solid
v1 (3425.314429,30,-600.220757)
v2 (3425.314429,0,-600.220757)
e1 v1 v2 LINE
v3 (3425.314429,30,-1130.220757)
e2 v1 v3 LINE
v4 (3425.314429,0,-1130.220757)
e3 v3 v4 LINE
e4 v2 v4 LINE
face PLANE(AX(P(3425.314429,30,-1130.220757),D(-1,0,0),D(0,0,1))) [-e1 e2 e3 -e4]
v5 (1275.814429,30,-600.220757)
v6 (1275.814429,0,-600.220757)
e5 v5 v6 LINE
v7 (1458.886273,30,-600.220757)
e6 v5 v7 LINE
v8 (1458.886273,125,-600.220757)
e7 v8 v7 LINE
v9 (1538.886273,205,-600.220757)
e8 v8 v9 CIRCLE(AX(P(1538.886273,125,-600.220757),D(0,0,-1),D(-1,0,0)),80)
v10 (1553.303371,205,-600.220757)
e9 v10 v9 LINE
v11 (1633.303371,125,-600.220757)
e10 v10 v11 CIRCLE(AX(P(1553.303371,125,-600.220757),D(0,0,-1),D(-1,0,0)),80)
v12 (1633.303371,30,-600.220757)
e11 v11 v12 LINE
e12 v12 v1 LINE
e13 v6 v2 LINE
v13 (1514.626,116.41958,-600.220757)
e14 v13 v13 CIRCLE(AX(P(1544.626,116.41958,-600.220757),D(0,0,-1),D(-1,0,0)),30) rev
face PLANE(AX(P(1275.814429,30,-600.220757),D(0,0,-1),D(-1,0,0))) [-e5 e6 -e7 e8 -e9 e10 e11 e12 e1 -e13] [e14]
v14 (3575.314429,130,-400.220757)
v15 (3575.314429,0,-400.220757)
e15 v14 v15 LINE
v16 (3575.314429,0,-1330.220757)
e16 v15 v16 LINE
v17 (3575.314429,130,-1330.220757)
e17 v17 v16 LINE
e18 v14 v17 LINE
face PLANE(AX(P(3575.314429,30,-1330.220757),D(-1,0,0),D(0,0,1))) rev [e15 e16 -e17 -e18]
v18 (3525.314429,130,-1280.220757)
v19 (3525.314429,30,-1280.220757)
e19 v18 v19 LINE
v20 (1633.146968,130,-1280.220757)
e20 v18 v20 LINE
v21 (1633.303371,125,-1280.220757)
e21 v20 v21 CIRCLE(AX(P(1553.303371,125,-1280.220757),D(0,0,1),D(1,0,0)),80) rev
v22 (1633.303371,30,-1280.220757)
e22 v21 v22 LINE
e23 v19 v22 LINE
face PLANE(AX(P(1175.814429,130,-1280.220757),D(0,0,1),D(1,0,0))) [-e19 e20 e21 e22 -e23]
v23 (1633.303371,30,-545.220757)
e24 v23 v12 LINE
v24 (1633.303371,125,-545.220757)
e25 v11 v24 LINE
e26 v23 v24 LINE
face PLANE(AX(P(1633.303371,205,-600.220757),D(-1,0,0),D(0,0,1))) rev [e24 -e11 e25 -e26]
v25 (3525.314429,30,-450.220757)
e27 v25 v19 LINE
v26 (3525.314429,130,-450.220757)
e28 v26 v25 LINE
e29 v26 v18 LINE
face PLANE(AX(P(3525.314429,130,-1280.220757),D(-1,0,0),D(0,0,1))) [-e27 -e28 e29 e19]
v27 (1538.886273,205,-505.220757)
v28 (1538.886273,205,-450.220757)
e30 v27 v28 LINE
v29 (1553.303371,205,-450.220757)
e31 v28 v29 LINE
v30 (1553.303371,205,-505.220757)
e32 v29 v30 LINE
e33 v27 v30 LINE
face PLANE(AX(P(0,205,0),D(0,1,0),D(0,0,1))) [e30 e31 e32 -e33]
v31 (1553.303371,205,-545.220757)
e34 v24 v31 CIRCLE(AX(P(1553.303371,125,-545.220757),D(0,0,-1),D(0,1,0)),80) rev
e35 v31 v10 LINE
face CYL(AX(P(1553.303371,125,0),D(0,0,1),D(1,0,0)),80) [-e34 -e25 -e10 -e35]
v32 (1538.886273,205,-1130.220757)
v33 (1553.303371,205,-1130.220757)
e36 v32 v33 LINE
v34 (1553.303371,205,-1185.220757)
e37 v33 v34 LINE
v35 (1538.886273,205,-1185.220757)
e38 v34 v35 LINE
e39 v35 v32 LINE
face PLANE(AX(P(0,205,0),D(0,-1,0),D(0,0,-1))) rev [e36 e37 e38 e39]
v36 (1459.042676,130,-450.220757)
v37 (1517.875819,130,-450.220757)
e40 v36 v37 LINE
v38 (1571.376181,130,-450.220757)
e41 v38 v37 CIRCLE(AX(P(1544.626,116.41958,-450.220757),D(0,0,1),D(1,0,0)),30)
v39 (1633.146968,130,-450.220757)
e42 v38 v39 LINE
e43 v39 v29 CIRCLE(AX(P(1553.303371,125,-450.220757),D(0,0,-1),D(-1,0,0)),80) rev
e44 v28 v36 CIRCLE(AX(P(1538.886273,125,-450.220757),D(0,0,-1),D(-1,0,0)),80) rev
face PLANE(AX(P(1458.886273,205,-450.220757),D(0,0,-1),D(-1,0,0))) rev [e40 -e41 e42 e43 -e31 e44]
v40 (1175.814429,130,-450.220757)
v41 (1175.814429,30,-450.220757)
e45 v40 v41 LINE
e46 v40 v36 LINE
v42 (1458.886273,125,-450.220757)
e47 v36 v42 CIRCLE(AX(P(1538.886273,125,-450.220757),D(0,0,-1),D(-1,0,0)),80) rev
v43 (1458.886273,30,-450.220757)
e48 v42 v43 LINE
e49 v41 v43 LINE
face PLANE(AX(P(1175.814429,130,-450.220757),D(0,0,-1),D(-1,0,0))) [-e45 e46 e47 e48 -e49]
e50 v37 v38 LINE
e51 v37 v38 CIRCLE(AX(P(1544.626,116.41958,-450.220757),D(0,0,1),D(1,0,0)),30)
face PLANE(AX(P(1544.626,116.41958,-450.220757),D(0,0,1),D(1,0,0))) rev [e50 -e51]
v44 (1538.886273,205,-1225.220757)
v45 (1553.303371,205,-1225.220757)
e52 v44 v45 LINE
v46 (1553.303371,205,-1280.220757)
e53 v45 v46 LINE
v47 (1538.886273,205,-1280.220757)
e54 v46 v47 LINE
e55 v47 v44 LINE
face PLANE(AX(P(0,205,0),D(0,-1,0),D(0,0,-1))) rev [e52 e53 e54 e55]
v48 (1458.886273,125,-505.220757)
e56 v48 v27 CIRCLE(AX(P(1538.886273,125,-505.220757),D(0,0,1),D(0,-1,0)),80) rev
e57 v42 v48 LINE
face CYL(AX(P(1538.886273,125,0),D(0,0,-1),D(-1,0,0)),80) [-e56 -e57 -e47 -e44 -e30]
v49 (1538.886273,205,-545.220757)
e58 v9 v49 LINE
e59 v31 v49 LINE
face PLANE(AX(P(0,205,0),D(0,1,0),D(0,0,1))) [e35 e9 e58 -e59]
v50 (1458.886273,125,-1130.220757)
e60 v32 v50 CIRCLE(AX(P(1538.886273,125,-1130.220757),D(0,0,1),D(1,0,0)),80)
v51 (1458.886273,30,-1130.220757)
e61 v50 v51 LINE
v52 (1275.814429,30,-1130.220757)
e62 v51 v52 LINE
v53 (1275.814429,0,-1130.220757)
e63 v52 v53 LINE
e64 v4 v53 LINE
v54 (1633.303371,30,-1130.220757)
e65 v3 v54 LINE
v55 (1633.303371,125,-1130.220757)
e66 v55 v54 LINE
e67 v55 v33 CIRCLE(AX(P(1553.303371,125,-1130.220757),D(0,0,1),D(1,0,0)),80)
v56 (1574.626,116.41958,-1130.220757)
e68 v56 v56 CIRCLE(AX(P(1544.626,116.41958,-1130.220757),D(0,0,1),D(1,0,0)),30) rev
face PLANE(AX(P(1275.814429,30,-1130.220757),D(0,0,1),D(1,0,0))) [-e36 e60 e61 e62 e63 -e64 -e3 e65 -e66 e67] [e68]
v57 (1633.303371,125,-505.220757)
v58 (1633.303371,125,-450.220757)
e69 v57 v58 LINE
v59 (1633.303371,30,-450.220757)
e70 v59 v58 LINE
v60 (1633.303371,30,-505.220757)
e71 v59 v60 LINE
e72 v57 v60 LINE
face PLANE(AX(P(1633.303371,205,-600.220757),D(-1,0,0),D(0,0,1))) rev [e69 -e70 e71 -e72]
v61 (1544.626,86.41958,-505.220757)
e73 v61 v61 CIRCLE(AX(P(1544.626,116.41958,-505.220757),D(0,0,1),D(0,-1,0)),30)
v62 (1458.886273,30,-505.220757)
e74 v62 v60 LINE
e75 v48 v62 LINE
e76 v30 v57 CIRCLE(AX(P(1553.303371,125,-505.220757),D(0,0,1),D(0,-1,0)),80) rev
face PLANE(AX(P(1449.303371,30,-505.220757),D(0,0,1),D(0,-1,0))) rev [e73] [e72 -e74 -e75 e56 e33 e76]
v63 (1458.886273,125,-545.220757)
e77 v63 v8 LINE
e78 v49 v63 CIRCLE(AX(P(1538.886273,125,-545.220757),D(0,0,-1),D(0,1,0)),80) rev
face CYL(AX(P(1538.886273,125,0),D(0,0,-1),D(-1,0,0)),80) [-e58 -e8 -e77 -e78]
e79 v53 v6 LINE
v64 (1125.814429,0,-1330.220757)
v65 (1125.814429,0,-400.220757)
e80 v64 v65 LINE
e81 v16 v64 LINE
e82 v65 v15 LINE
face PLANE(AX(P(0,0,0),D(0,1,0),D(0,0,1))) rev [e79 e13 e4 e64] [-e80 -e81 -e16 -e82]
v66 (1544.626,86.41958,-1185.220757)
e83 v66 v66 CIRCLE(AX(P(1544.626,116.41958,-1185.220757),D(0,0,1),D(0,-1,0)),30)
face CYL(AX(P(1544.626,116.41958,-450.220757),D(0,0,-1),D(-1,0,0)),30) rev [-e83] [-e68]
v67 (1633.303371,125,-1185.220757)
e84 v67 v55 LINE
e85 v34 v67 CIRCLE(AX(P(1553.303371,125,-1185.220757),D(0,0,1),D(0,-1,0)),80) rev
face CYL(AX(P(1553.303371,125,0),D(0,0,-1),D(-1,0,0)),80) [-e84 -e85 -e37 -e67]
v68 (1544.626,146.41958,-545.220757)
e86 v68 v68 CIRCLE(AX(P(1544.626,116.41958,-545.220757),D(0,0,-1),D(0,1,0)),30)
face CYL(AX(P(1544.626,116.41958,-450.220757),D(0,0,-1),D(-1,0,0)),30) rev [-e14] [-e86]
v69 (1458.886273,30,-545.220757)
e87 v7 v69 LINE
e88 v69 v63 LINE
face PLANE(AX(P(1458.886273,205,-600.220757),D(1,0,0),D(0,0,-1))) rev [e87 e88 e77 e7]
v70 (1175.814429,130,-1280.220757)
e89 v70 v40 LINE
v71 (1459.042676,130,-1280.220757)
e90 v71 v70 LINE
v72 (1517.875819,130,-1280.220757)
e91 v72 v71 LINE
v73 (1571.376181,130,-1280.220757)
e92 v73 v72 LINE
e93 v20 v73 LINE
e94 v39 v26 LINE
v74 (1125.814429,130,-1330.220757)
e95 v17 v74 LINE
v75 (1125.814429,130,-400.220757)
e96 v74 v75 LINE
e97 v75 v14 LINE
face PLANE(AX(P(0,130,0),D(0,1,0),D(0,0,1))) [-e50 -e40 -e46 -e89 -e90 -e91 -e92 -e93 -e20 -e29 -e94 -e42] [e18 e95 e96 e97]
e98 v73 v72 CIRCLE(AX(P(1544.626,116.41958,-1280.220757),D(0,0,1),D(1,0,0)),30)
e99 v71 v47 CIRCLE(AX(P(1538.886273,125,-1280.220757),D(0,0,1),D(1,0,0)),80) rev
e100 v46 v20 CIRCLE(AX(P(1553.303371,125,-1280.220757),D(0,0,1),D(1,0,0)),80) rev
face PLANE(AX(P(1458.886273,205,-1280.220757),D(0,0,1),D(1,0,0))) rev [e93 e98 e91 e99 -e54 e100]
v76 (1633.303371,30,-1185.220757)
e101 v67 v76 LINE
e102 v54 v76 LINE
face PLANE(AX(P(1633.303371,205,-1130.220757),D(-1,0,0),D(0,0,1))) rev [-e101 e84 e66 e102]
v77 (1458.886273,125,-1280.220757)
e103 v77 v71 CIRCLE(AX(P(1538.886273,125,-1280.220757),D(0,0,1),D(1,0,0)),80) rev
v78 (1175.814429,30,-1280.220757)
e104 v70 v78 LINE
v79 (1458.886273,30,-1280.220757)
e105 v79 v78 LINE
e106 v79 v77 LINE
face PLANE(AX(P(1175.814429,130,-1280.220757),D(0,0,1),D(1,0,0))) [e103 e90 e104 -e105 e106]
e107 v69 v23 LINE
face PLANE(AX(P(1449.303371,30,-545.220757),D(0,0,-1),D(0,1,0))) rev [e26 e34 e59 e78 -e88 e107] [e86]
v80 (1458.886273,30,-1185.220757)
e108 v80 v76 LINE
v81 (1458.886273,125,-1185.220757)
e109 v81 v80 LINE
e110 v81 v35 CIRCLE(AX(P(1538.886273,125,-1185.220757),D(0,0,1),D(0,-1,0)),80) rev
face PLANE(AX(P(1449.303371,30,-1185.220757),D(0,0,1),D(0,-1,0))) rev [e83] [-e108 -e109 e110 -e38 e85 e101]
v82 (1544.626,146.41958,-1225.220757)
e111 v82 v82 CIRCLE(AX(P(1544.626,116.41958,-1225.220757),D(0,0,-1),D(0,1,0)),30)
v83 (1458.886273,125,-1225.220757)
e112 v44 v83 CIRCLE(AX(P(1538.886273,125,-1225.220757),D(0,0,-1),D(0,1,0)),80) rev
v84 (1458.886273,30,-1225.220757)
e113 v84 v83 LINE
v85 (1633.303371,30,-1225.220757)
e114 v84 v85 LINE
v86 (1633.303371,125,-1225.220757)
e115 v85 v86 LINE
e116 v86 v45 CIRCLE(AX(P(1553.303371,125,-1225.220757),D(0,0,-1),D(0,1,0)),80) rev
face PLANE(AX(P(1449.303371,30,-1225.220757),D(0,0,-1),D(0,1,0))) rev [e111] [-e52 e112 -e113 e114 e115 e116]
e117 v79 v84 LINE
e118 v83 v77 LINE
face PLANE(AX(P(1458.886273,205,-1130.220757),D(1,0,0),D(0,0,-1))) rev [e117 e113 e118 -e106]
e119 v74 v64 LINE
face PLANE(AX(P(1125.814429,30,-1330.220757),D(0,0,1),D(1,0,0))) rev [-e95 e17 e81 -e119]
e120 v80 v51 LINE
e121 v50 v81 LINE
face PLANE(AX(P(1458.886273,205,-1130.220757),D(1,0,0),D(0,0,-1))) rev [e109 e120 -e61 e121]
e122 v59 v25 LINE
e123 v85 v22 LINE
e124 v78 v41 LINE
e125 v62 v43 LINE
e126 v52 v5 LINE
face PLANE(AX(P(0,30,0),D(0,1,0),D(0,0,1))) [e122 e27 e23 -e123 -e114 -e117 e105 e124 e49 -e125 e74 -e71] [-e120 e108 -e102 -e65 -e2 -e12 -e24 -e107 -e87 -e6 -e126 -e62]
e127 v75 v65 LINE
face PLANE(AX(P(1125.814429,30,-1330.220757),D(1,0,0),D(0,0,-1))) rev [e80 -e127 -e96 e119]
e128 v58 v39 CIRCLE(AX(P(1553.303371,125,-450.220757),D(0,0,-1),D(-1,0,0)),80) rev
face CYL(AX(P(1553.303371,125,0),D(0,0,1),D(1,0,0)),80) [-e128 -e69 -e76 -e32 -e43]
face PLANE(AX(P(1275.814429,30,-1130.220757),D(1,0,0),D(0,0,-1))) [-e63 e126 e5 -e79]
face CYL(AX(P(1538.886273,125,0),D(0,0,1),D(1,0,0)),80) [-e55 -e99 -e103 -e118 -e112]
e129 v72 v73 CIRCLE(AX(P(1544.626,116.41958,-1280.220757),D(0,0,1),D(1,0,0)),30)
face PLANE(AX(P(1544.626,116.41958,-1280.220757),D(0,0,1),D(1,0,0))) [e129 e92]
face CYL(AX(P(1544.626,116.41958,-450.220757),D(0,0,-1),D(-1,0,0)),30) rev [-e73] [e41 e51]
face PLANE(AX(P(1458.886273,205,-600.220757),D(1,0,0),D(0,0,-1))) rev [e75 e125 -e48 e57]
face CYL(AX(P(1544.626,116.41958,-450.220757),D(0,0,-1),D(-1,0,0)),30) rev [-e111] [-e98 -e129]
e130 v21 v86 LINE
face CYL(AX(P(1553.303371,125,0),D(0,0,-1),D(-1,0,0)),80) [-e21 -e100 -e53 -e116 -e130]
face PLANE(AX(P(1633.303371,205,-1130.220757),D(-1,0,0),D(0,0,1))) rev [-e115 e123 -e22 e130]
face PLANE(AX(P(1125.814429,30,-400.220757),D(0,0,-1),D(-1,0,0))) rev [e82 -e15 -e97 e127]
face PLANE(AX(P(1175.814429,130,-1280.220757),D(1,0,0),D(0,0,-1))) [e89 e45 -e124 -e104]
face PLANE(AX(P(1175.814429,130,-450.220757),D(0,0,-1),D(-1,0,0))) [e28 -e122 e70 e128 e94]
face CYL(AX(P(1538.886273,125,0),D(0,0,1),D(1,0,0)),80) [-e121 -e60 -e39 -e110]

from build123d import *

# Parameters (mm, degrees)
SKETCH4_W               = 2449.5
SKETCH4_H               = 930
SKETCH4_W_2             = 2149.5
SKETCH4_H_2             = 530
BOSS_EXTRUDE2_DEPTH     = 30
SKETCH6_W               = 2449.5
SKETCH6_H               = 930
SKETCH6_W_2             = 2349.5
SKETCH6_H_2             = 830
BOSS_EXTRUDE3_DEPTH     = 100
SKETCH8_W               = 174.417097876
SKETCH8_H               = 150
BOSS_EXTRUDE4_DEPTH     = 175
CUT_EXTRUDE1_DEPTH      = 680
CUT_EXTRUDE1_DEPTH_BACK = 150
SKETCH10_R              = 30
FILLET1_R               = 80
SKETCH12_W              = 40
SKETCH12_H              = 200
CUT_EXTRUDE2_DEPTH      = 184


with BuildPart() as part:
    # Sketch4 → Boss-Extrude2 (new body)
    with BuildSketch(Plane(origin=(0, 0, 0), x_dir=(1, 0, 0), z_dir=(0, 1, 0))):
        with Locations((2350.564429087, 865.22075714)):
            Rectangle(SKETCH4_W, SKETCH4_H)
        with Locations((2350.564429087, 865.22075714)):
            Rectangle(SKETCH4_W_2, SKETCH4_H_2, mode=Mode.SUBTRACT)
    extrude(amount=BOSS_EXTRUDE2_DEPTH)

    # Sketch6 → Boss-Extrude3 (add)
    with BuildSketch(Plane(origin=(0, 30, 0), x_dir=(1, 0, 0), z_dir=(0, 1, 0))):
        with Locations((2350.564429087, 865.22075714)):
            Rectangle(SKETCH6_W, SKETCH6_H)
        with Locations((2350.564429087, 865.22075714)):
            Rectangle(SKETCH6_W_2, SKETCH6_H_2, mode=Mode.SUBTRACT)
    extrude(amount=BOSS_EXTRUDE3_DEPTH)

    # Sketch8 → Boss-Extrude4 (add)
    with BuildSketch(Plane(origin=(0, 30, 0), x_dir=(1, 0, 0), z_dir=(0, 1, 0))):
        with Locations((1546.094821657, 1205.22075714)):
            Rectangle(SKETCH8_W, SKETCH8_H)
        with Locations((1546.094821657, 525.22075714)):
            Rectangle(SKETCH8_W, SKETCH8_H)
    extrude(amount=BOSS_EXTRUDE4_DEPTH)

    # Sketch10 → Cut-Extrude1 (cut, two sides: drawn at the far end of the back side and taken through both)
    with BuildSketch(Plane.XY.offset(-1130.22075714).offset(-CUT_EXTRUDE1_DEPTH_BACK)):
        with Locations(Location((1544.625999864, 116.419579706, 0), (0, 0, 180))):
            Circle(SKETCH10_R)
    extrude(amount=CUT_EXTRUDE1_DEPTH + CUT_EXTRUDE1_DEPTH_BACK, mode=Mode.SUBTRACT)

    # Fillet1
    # the kernel refuses this fillet: 80 mm, written as the material it takes off along each edge
    with BuildSketch(Plane(origin=(1633.303370595, 205, -1280.22075714), x_dir=(0, -1, 0), z_dir=(0, 0, 1)), Plane(origin=(1458.886272719, 205, -450.22075714), x_dir=(0, -1, 0), z_dir=(0, 0, -1))) as fillet1_piece_1:
        with BuildLine():
            CenterArc((FILLET1_R, -FILLET1_R), FILLET1_R, 90, 90)
            Line((0, -FILLET1_R), (0, 0))
            Line((0, 0), (FILLET1_R, 0))
        make_face()
    extrude(amount=350, mode=Mode.SUBTRACT)
    with BuildSketch(Plane(origin=(1458.886272719, 205, -930.22075714), x_dir=(1, 0, 0), z_dir=(0, 0, -1)), Plane(origin=(1633.303370595, 205, -800.22075714), x_dir=(-1, 0, 0), z_dir=(0, 0, 1))) as fillet1_piece_2:
        with BuildLine():
            CenterArc((FILLET1_R, FILLET1_R), FILLET1_R, 180, 90)
            Line((0, FILLET1_R), (0, 0))
            Line((0, 0), (FILLET1_R, 0))
        make_face()
    extrude(amount=350, mode=Mode.SUBTRACT)

    # Sketch12 → Cut-Extrude2 (cut)
    with BuildSketch(Plane(origin=(1633.303370595, 0, 0), x_dir=(0, 0, -1), z_dir=(1, 0, 0))):
        with Locations((1205.22075714, 130)):
            Rectangle(SKETCH12_W, SKETCH12_H)
        with Locations((525.22075714, 130)):
            Rectangle(SKETCH12_W, SKETCH12_H)
    extrude(amount=-CUT_EXTRUDE2_DEPTH, mode=Mode.SUBTRACT)


solid = part.part
